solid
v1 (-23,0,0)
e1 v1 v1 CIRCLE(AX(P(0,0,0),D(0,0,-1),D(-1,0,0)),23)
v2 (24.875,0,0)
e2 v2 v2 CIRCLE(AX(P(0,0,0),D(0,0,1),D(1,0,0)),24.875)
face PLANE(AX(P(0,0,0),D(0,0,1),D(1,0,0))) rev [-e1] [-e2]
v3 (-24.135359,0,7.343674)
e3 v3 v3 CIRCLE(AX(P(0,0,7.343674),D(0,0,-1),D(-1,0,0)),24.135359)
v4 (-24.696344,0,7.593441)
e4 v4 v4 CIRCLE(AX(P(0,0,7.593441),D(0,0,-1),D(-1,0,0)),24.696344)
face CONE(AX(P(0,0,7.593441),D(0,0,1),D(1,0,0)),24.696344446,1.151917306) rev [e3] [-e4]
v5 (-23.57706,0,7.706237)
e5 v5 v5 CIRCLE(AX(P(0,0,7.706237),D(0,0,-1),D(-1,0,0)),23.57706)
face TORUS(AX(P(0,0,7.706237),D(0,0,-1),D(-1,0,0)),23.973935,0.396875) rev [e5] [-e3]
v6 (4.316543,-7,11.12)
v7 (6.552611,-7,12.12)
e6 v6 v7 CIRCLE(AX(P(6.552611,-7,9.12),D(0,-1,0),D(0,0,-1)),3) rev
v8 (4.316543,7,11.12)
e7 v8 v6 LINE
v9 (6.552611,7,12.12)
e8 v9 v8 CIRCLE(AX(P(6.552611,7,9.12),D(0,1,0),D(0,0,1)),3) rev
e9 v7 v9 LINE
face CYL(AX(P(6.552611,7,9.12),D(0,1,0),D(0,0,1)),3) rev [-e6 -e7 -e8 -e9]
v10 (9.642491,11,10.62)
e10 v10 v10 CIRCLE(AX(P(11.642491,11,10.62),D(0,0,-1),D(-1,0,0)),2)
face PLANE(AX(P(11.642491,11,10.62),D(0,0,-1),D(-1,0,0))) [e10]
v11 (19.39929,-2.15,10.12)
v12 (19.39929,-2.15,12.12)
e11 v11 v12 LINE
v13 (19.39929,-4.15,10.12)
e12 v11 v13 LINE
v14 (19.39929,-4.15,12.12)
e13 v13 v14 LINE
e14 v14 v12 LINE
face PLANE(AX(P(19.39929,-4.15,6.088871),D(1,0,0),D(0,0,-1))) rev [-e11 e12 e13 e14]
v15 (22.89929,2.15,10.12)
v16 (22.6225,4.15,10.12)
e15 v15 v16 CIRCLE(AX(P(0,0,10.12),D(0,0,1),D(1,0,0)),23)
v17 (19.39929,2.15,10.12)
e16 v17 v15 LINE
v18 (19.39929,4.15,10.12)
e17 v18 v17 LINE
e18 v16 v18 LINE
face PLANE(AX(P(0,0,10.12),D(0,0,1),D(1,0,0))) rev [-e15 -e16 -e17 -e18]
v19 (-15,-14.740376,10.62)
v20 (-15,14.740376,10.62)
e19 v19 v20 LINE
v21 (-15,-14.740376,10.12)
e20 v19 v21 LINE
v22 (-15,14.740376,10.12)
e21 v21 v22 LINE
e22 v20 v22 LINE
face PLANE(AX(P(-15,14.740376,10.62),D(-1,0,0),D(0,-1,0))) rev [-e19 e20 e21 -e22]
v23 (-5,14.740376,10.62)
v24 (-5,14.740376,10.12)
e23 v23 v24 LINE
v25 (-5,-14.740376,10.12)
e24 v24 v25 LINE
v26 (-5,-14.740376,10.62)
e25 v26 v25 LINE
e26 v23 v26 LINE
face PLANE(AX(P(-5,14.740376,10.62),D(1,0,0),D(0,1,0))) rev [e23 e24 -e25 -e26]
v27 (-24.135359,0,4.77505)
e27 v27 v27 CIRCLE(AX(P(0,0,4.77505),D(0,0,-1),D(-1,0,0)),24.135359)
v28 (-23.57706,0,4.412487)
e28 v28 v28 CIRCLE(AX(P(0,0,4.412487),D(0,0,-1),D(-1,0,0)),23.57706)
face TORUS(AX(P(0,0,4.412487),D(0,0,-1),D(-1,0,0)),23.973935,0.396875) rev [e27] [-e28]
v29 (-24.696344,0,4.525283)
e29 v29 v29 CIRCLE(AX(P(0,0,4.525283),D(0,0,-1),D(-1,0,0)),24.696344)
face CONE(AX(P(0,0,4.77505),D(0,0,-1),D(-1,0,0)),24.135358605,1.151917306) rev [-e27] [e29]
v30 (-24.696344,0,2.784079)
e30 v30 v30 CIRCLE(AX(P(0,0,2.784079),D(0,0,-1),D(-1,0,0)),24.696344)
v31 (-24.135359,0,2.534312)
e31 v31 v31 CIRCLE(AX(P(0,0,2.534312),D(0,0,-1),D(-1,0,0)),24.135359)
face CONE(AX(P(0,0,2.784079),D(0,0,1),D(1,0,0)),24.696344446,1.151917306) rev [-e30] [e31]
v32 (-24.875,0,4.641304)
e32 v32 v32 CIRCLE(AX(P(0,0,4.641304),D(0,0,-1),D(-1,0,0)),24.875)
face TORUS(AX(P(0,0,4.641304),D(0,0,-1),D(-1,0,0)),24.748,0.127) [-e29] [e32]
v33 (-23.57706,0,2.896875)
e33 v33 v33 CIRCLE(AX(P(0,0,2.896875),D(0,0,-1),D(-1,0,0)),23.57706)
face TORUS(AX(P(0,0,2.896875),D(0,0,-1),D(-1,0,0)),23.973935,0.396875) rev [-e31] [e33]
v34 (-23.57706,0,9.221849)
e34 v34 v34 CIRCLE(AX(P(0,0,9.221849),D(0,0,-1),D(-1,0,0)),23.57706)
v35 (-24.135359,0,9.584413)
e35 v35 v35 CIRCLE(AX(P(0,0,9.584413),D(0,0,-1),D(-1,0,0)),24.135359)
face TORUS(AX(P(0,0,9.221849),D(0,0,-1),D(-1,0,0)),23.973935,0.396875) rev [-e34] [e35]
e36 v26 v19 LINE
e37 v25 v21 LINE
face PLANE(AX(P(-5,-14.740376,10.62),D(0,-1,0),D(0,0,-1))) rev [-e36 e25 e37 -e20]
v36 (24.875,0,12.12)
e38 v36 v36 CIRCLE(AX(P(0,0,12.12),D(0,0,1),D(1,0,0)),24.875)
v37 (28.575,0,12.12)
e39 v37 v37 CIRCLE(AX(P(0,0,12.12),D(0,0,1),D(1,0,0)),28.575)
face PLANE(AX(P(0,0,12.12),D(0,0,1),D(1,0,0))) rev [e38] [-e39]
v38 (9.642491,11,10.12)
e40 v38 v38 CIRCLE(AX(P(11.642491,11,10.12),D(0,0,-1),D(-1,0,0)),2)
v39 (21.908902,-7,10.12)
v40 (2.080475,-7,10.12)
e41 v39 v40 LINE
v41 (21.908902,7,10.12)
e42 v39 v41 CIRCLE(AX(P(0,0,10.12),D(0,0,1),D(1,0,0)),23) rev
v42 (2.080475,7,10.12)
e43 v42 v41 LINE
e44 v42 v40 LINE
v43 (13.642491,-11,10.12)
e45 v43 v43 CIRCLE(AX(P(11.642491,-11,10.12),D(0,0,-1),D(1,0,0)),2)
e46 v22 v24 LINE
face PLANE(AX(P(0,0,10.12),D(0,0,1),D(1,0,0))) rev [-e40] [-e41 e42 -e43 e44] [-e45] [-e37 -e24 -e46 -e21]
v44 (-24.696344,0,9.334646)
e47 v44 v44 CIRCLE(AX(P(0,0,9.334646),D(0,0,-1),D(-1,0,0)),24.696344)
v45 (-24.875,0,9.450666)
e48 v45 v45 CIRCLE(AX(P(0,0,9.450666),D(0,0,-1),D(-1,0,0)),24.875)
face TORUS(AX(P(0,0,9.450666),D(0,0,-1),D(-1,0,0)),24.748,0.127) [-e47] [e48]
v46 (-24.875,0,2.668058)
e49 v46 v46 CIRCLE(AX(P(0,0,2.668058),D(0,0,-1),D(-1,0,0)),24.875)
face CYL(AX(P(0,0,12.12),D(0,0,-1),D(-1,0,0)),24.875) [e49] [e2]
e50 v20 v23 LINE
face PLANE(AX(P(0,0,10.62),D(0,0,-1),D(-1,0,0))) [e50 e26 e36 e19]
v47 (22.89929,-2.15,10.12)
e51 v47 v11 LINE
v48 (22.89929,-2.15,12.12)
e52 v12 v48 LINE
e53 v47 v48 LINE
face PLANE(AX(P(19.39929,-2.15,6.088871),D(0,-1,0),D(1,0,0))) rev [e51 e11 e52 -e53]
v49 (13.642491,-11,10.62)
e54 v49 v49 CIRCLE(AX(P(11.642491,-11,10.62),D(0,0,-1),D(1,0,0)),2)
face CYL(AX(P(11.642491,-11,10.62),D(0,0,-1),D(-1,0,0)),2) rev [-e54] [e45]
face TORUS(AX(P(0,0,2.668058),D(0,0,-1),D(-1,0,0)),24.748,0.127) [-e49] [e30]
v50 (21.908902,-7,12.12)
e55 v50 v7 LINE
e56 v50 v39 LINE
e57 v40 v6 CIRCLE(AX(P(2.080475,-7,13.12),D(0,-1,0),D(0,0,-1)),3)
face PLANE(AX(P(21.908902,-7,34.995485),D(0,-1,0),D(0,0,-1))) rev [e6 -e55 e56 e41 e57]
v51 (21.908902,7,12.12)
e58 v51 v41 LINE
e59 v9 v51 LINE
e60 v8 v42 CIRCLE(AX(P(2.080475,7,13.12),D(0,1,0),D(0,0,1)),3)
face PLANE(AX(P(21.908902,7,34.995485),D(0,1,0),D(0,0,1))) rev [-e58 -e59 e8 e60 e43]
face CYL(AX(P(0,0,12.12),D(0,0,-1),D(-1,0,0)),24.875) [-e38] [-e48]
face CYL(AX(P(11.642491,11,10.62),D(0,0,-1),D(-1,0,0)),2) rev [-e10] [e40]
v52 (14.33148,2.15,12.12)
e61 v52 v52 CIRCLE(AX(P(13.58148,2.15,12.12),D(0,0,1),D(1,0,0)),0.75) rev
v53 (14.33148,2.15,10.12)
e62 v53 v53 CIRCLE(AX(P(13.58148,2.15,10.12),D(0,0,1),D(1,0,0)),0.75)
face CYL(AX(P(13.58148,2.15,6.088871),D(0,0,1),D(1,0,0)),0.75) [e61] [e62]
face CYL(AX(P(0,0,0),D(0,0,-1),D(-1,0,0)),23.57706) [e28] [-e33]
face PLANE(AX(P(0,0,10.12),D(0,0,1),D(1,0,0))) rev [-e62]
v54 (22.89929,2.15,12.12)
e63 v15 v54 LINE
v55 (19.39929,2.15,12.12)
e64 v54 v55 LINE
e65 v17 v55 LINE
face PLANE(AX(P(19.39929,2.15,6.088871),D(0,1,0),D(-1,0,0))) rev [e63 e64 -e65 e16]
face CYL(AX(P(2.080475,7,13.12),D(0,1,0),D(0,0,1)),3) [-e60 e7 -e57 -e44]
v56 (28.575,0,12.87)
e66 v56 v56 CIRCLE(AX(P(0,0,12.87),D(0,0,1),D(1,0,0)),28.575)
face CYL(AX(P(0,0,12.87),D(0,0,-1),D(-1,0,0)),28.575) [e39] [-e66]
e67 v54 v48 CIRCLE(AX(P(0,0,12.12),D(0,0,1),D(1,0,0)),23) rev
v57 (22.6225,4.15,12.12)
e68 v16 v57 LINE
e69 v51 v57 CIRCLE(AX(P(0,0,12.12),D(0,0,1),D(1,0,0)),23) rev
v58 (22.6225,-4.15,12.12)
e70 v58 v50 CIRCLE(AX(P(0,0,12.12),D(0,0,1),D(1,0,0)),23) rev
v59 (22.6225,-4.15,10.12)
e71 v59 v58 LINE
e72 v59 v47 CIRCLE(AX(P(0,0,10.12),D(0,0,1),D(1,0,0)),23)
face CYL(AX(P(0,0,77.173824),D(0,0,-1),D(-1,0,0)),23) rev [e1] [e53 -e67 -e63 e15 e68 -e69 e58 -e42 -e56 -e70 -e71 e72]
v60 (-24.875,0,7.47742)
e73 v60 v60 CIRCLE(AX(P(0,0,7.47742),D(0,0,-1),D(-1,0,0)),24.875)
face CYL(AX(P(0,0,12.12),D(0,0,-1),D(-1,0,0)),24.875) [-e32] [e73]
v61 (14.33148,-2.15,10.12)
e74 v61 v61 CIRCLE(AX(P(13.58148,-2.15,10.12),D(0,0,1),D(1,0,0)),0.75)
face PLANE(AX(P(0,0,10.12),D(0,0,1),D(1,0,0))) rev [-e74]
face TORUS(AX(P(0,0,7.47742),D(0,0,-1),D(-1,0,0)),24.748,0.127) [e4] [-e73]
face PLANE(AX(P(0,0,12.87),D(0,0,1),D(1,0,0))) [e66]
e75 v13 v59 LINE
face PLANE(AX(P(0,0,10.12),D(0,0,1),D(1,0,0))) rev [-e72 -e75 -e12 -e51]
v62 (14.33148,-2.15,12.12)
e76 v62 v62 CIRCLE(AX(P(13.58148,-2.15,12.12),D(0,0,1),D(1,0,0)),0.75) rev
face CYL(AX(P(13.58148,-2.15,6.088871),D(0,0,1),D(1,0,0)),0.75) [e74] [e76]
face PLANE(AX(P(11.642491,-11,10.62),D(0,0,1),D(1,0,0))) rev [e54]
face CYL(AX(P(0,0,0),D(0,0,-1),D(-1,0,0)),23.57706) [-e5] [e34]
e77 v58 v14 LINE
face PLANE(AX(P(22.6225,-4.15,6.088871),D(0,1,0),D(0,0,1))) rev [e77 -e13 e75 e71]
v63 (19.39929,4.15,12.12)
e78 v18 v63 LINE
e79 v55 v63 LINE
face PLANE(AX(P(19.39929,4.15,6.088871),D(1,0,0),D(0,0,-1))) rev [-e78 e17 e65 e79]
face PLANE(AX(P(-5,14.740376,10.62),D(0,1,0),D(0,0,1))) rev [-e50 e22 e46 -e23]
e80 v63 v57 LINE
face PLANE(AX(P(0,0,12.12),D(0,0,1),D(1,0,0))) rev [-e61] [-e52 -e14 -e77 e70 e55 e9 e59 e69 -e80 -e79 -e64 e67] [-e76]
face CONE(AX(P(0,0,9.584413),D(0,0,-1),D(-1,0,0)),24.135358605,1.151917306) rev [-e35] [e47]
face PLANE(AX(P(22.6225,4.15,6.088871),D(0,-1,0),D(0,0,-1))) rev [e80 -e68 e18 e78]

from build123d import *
from build123d.topology import SkipClean

# Parameters (mm, degrees)
SKETCH1_R            = 24.875
BOSS_EXTRUDE1_DEPTH  = 12.12
SKETCH3_R            = 23
CUT_EXTRUDE1_DEPTH   = 10.12
CUT_EXTRUDE2_DEPTH   = 2
SKETCH13_R           = 28.575
BOSS_EXTRUDE11_DEPTH = 0.75
FILLET1_R            = 3
FILLET2_R            = 3
SKETCH15_R           = 2
SKETCH15_W           = 10
SKETCH15_H           = 29.48075205
CUT_EXTRUDE3_DEPTH   = 0.5
BOSS_EXTRUDE12_START = 2
SKETCH16_R           = 0.75
BOSS_EXTRUDE12_DEPTH = 2


with BuildPart() as part:
    # Sketch1 → Boss-Extrude1 (new body)
    with BuildSketch(Plane.XY):
        Circle(SKETCH1_R)
    extrude(amount=BOSS_EXTRUDE1_DEPTH)

    # Sketch2 → Cut-Revolve1 (revolve, cut)
    with BuildSketch(Plane(origin=(0, 0, 0), x_dir=(1, 0, 0), z_dir=(0, 1, 0)), mode=Mode.PRIVATE) as cut_revolve1_sk:
        with BuildLine():
            Line((24.696344446, -4.525283456), (24.135358605, -4.775050444))
            ThreePointArc((24.135358605, -4.775050444), (23.757781383, -4.745334472), (23.57706, -4.412487091))
            Line((23.57706, -4.412487091), (23.57706, -2.896875))
            ThreePointArc((23.57706, -2.896875), (23.757781383, -2.564027618), (24.135358605, -2.534311646))
            Line((24.135358605, -2.534311646), (24.696344446, -2.784078635))
            ThreePointArc((24.696344446, -2.784078635), (24.817169157, -2.774569524), (24.875, -2.668058362))
            Line((24.875, -2.668058362), (24.875, -4.641303729))
            ThreePointArc((24.875, -4.641303729), (24.817169157, -4.534792567), (24.696344446, -4.525283456))
        make_face()
        with BuildLine():
            Line((24.696344446, -9.334645546), (24.135358605, -9.584412535))
            ThreePointArc((24.135358605, -9.584412535), (23.757781383, -9.554696563), (23.57706, -9.221849181))
            Line((23.57706, -9.221849181), (23.57706, -7.706237091))
            ThreePointArc((23.57706, -7.706237091), (23.757781383, -7.373389709), (24.135358605, -7.343673737))
            Line((24.135358605, -7.343673737), (24.696344446, -7.593440726))
            ThreePointArc((24.696344446, -7.593440726), (24.817169157, -7.583931615), (24.875, -7.477420453))
            Line((24.875, -7.477420453), (24.875, -9.450665819))
            ThreePointArc((24.875, -9.450665819), (24.817169157, -9.344154657), (24.696344446, -9.334645546))
        make_face()
    revolve(cut_revolve1_sk.sketch.rotate(Axis((0, 0, 0), (0, 0, 1)), 180), axis=Axis((0, 0, 0), (0, 0, 1)), mode=Mode.SUBTRACT)

    # Sketch3 → Cut-Extrude1 (cut)
    with BuildSketch(Plane(origin=(0, 0, 0), x_dir=(-1, 0, 0), z_dir=(0, 0, -1))):
        Circle(SKETCH3_R)
    extrude(amount=-CUT_EXTRUDE1_DEPTH, mode=Mode.SUBTRACT)

    # Sketch4 → Cut-Extrude2 (cut)
    with SkipClean():  # the faces are left unmerged after this step: merging them gives an invalid solid
        with BuildSketch(Plane(origin=(0, 0, 10.12), x_dir=(-1, 0, 0), z_dir=(0, 0, -1))):
            with BuildLine():
                Line((-21.9089023, 7), (-4.9089023, 7))
                Line((-4.9089023, 7), (-4.9089023, -7))
                Line((-4.9089023, -7), (-21.9089023, -7))
                ThreePointArc((-21.9089023, -7), (-23, 0), (-21.9089023, 7))
            make_face()
        extrude(amount=-CUT_EXTRUDE2_DEPTH, mode=Mode.SUBTRACT)

    # Sketch13 → Boss-Extrude11 (add)
    with SkipClean():  # the faces are left unmerged after this step: merging them gives an invalid solid
        with BuildSketch(Plane.XY.offset(12.12)):
            Circle(SKETCH13_R)
        extrude(amount=BOSS_EXTRUDE11_DEPTH)

    # Fillet1
    # the kernel refuses this fillet: 3 mm, written as the material it takes off along each edge
    with BuildSketch(Plane(origin=(4.9089023, 7, 10.12), x_dir=(-1, 0, 0), z_dir=(0, -1, 0))) as fillet1_piece_1:
        with BuildLine():
            CenterArc((2.828427125, -3), FILLET1_R, 90, 70.528779366)
            Line((0, -2), (-0.056568542, -1.98))
            ThreePointArc((-0.056568542, -1.98), (-0.06, -1), (-0.06, 0))
            Line((-0.06, 0), (0, 0.06))
            Line((0, 0.06), (2.828427125, 0.06))
            Line((2.828427125, 0.06), (2.828427125, 0))
        make_face()
    extrude(amount=14, mode=Mode.SUBTRACT)

    # Fillet2
    # the kernel refuses this fillet: 3 mm, written as the material it adds along each edge
    with BuildSketch(Plane(origin=(4.9089023, 11.109272076, 12.12), x_dir=(-0.5096537321044121, 0, -0.8603796100280643), z_dir=(0, -1, 0))) as fillet2_piece_1:
        with BuildLine():
            CenterArc((1.74341649, 2.943174759), FILLET2_R, 210.640767765, 48.189685104)
            Line((-0.83772234, 1.414213562), (0, 0))
            ThreePointArc((0, 0), (0.58113883, 0.056825241), (1.16227766, 0))
        make_face()
    extrude(amount=22.218544151)

    # Sketch15 → Cut-Extrude3 (cut)
    with BuildSketch(Plane(origin=(0, 0, 10.12), x_dir=(-1, 0, 0), z_dir=(0, 0, -1))):
        with Locations((-11.642490831, 11)):
            Circle(SKETCH15_R)
        with Locations(Location((-11.642490831, -11, 0), (0, 0, 180))):
            Circle(SKETCH15_R)
        with Locations((10, 0)):
            Rectangle(SKETCH15_W, SKETCH15_H)
    extrude(amount=-CUT_EXTRUDE3_DEPTH, mode=Mode.SUBTRACT)

    # Sketch16 → Boss-Extrude12 (add)
    with SkipClean():  # the faces are left unmerged after this step: merging them gives an invalid solid
        with BuildSketch(Plane(origin=(0, 0, 12.12), x_dir=(-1, 0, 0), z_dir=(0, 0, -1)).offset(BOSS_EXTRUDE12_START)):
            with Locations(Location((-13.58148036, -2.15, 0), (0, 0, 180))):
                Circle(SKETCH16_R)
            with Locations(Location((-13.58148036, 2.15, 0), (0, 0, 180))):
                Circle(SKETCH16_R)
            with BuildLine():
                Line((-22.622499862, 4.15), (-19.399290382, 4.15))
                Line((-19.399290382, 4.15), (-19.399290382, 2.15))
                Line((-19.399290382, 2.15), (-22.899290382, 2.15))
                ThreePointArc((-22.899290382, 2.15), (-22.782852033, 3.153038732), (-22.622499862, 4.15))
            make_face()
            with BuildLine():
                Line((-19.399290382, -2.15), (-22.899290382, -2.15))
                ThreePointArc((-22.899290382, -2.15), (-22.782852033, -3.153038732), (-22.622499862, -4.15))
                Line((-22.622499862, -4.15), (-19.399290382, -4.15))
                Line((-19.399290382, -4.15), (-19.399290382, -2.15))
            make_face()
        extrude(amount=-BOSS_EXTRUDE12_DEPTH)


solid = part.part
